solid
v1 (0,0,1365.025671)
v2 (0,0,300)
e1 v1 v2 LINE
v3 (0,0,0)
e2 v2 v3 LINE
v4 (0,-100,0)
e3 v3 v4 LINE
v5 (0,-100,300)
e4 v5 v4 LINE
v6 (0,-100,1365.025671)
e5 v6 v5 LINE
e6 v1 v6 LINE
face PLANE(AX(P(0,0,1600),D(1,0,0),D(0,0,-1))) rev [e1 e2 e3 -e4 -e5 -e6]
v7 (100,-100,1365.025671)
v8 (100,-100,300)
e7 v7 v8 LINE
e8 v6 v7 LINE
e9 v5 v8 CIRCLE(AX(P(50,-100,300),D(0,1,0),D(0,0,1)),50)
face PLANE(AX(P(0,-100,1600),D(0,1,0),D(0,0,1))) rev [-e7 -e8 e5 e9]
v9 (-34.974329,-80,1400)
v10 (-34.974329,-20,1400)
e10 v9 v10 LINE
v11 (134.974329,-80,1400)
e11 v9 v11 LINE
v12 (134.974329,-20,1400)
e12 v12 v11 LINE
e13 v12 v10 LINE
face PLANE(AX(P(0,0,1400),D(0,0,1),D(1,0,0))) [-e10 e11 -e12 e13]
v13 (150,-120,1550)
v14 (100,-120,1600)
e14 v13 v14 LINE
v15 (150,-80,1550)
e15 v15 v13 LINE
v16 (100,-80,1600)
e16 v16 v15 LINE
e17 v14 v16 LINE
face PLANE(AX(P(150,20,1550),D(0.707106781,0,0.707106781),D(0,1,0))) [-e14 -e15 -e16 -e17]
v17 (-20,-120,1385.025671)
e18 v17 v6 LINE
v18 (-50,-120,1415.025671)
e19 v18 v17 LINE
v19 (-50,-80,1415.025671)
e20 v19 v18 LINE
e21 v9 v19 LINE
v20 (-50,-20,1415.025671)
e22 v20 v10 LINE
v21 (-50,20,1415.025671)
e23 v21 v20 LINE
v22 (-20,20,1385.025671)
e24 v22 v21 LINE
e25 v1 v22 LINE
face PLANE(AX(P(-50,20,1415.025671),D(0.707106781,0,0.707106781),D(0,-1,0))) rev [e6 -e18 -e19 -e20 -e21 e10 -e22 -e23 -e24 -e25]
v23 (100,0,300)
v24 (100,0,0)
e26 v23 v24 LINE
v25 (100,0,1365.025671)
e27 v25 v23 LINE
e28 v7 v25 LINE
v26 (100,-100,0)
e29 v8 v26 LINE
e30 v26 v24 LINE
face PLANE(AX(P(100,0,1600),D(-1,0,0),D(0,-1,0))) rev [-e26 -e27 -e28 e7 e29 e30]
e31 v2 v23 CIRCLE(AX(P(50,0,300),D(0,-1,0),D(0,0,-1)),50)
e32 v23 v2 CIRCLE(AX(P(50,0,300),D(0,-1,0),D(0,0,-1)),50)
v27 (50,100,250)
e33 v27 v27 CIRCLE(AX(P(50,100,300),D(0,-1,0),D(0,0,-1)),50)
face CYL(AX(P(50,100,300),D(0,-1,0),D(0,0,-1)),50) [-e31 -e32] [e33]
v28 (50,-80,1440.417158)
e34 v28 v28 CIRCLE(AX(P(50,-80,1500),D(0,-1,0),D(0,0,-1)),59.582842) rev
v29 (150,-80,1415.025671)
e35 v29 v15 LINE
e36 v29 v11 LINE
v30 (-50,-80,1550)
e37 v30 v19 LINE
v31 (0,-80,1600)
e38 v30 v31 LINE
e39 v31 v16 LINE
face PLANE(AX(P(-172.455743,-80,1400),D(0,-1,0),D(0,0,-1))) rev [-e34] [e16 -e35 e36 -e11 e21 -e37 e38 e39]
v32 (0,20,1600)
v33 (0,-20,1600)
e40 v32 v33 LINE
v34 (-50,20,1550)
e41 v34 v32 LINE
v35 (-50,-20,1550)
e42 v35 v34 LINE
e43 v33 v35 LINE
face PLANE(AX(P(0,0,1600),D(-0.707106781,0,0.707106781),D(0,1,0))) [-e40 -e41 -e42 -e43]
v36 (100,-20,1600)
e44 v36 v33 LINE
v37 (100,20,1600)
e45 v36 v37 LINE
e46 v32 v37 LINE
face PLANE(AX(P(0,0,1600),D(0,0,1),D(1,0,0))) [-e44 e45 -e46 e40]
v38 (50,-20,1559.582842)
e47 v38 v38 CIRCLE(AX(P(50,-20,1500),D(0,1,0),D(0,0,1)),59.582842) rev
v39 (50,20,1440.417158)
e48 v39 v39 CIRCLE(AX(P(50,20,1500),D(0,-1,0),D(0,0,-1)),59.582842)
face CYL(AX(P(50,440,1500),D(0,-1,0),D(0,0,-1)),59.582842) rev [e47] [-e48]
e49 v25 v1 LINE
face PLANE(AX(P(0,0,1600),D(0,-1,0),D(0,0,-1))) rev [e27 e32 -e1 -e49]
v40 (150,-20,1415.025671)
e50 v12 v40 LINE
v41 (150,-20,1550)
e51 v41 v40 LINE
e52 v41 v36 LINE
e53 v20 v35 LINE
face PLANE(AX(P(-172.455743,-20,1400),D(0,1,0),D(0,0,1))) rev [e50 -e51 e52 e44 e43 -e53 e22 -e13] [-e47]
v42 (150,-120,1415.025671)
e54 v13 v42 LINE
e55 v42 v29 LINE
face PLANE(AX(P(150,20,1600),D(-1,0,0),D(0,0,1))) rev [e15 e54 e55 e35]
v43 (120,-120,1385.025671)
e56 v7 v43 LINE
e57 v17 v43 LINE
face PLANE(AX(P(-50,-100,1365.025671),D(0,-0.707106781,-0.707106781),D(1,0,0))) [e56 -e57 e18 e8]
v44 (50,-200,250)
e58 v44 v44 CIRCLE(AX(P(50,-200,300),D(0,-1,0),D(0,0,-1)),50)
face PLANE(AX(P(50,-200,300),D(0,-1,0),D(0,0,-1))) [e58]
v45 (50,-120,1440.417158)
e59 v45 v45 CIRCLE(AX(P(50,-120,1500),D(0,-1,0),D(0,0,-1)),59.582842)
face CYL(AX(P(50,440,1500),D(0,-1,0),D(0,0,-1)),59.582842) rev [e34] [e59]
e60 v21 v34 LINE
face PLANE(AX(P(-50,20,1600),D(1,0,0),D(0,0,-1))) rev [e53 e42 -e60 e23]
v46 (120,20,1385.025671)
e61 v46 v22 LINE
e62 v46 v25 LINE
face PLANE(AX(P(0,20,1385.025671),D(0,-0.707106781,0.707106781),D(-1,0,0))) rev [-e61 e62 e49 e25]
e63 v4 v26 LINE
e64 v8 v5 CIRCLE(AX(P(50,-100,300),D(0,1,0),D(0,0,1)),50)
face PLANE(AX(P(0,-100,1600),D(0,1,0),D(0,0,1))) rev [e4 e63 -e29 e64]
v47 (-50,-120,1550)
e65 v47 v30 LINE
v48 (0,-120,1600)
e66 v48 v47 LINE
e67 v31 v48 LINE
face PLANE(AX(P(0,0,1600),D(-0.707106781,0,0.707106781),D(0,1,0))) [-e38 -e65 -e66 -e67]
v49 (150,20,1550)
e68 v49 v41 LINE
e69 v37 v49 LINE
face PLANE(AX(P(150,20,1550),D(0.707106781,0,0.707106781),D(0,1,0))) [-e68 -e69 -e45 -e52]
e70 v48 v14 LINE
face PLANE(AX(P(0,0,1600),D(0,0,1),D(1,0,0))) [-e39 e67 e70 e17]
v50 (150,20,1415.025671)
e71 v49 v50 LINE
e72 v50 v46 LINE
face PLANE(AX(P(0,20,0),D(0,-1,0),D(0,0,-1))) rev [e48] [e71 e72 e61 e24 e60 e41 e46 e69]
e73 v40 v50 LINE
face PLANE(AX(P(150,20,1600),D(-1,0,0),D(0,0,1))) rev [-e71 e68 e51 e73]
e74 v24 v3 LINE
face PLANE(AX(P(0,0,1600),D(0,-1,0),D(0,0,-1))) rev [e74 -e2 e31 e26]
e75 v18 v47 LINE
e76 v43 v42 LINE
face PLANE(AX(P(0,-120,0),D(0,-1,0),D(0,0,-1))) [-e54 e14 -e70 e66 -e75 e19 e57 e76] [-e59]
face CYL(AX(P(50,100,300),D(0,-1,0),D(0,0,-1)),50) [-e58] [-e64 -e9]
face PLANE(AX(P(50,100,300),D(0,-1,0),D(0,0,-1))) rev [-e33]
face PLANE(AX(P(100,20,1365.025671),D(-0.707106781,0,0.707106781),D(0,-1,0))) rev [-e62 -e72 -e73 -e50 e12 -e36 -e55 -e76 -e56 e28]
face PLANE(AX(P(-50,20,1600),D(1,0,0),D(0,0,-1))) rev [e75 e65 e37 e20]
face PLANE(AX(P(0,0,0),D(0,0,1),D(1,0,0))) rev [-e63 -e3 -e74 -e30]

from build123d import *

# Parameters (mm, degrees)
SKETCH1_W                = 100
SKETCH1_H                = 100
BOSS_EXTRUDE1_DEPTH      = 1600
BOSS_EXTRUDE2_DEPTH      = 100
BOSS_EXTRUDE2_DEPTH_BACK = 200
SKETCH2_R                = 50
BOSS_EXTRUDE3_DEPTH      = 20
BOSS_EXTRUDE3_DEPTH_BACK = 120
SKETCH4_W                = 200
SKETCH4_H                = 234.974329415
CHAMFER1_SIZE            = 20
CHAMFER2_SIZE            = 50
SKETCH5_R                = 59.582841924
CUT_EXTRUDE2_DEPTH       = 560
SKETCH6_W                = 449.686922891
SKETCH6_H                = 60
CUT_EXTRUDE3_DEPTH       = 200


with BuildPart() as part:
    # Sketch1 → Boss-Extrude1 (new body)
    with BuildSketch(Plane.XY):
        with Locations((50, -50)):
            Rectangle(SKETCH1_W, SKETCH1_H)
    extrude(amount=BOSS_EXTRUDE1_DEPTH)

    # Sketch2 → Boss-Extrude2 (add, two sides: drawn at the far end of the back side and taken through both)
    with BuildSketch(Plane.XZ.offset(100).offset(-BOSS_EXTRUDE2_DEPTH_BACK)):
        with Locations(Location((50, 300, 0), (0, 0, 270))):
            Circle(SKETCH2_R)
    extrude(amount=BOSS_EXTRUDE2_DEPTH + BOSS_EXTRUDE2_DEPTH_BACK)

    # Sketch4 → Boss-Extrude3 (add, two sides: drawn at the far end of the back side and taken through both)
    with BuildSketch(Plane(origin=(0, 0, 0), x_dir=(1, 0, 0), z_dir=(0, 1, 0)).offset(-BOSS_EXTRUDE3_DEPTH_BACK)):
        with Locations((50, -1482.512835293)):
            Rectangle(SKETCH4_W, SKETCH4_H)
    extrude(amount=BOSS_EXTRUDE3_DEPTH + BOSS_EXTRUDE3_DEPTH_BACK)

    # Chamfer1
    chamfer1_edges = [part.edges().sort_by_distance(p)[0] for p in [
        (50, -120, 1365.025670585),
        (50, 20, 1365.025670585),
    ]]
    chamfer(chamfer1_edges, length=CHAMFER1_SIZE - 0.0001)  # a hair under: the kernel refuses the full size

    # Chamfer2
    chamfer2_edges = [part.edges().sort_by_distance(p)[0] for p in [
        (150, -50, 1365.025670585),
        (-50, -50, 1365.025670585),
        (150, -50, 1600),
        (-50, -50, 1600),
    ]]
    chamfer(chamfer2_edges, length=CHAMFER2_SIZE - 0.0001)  # a hair under: the kernel refuses the full size

    # Sketch5 → Cut-Extrude2 (cut)
    with BuildSketch(Plane.XZ.offset(120)):
        with Locations(Location((50, 1500, 0), (0, 0, 270))):
            Circle(SKETCH5_R)
    extrude(amount=-CUT_EXTRUDE2_DEPTH, mode=Mode.SUBTRACT)

    # Sketch6 → Cut-Extrude3 (cut)
    with BuildSketch(Plane.XY.offset(1600)):
        with Locations((52.387718175, -50)):
            Rectangle(SKETCH6_W, SKETCH6_H)
    extrude(amount=-CUT_EXTRUDE3_DEPTH, mode=Mode.SUBTRACT)


solid = part.part
